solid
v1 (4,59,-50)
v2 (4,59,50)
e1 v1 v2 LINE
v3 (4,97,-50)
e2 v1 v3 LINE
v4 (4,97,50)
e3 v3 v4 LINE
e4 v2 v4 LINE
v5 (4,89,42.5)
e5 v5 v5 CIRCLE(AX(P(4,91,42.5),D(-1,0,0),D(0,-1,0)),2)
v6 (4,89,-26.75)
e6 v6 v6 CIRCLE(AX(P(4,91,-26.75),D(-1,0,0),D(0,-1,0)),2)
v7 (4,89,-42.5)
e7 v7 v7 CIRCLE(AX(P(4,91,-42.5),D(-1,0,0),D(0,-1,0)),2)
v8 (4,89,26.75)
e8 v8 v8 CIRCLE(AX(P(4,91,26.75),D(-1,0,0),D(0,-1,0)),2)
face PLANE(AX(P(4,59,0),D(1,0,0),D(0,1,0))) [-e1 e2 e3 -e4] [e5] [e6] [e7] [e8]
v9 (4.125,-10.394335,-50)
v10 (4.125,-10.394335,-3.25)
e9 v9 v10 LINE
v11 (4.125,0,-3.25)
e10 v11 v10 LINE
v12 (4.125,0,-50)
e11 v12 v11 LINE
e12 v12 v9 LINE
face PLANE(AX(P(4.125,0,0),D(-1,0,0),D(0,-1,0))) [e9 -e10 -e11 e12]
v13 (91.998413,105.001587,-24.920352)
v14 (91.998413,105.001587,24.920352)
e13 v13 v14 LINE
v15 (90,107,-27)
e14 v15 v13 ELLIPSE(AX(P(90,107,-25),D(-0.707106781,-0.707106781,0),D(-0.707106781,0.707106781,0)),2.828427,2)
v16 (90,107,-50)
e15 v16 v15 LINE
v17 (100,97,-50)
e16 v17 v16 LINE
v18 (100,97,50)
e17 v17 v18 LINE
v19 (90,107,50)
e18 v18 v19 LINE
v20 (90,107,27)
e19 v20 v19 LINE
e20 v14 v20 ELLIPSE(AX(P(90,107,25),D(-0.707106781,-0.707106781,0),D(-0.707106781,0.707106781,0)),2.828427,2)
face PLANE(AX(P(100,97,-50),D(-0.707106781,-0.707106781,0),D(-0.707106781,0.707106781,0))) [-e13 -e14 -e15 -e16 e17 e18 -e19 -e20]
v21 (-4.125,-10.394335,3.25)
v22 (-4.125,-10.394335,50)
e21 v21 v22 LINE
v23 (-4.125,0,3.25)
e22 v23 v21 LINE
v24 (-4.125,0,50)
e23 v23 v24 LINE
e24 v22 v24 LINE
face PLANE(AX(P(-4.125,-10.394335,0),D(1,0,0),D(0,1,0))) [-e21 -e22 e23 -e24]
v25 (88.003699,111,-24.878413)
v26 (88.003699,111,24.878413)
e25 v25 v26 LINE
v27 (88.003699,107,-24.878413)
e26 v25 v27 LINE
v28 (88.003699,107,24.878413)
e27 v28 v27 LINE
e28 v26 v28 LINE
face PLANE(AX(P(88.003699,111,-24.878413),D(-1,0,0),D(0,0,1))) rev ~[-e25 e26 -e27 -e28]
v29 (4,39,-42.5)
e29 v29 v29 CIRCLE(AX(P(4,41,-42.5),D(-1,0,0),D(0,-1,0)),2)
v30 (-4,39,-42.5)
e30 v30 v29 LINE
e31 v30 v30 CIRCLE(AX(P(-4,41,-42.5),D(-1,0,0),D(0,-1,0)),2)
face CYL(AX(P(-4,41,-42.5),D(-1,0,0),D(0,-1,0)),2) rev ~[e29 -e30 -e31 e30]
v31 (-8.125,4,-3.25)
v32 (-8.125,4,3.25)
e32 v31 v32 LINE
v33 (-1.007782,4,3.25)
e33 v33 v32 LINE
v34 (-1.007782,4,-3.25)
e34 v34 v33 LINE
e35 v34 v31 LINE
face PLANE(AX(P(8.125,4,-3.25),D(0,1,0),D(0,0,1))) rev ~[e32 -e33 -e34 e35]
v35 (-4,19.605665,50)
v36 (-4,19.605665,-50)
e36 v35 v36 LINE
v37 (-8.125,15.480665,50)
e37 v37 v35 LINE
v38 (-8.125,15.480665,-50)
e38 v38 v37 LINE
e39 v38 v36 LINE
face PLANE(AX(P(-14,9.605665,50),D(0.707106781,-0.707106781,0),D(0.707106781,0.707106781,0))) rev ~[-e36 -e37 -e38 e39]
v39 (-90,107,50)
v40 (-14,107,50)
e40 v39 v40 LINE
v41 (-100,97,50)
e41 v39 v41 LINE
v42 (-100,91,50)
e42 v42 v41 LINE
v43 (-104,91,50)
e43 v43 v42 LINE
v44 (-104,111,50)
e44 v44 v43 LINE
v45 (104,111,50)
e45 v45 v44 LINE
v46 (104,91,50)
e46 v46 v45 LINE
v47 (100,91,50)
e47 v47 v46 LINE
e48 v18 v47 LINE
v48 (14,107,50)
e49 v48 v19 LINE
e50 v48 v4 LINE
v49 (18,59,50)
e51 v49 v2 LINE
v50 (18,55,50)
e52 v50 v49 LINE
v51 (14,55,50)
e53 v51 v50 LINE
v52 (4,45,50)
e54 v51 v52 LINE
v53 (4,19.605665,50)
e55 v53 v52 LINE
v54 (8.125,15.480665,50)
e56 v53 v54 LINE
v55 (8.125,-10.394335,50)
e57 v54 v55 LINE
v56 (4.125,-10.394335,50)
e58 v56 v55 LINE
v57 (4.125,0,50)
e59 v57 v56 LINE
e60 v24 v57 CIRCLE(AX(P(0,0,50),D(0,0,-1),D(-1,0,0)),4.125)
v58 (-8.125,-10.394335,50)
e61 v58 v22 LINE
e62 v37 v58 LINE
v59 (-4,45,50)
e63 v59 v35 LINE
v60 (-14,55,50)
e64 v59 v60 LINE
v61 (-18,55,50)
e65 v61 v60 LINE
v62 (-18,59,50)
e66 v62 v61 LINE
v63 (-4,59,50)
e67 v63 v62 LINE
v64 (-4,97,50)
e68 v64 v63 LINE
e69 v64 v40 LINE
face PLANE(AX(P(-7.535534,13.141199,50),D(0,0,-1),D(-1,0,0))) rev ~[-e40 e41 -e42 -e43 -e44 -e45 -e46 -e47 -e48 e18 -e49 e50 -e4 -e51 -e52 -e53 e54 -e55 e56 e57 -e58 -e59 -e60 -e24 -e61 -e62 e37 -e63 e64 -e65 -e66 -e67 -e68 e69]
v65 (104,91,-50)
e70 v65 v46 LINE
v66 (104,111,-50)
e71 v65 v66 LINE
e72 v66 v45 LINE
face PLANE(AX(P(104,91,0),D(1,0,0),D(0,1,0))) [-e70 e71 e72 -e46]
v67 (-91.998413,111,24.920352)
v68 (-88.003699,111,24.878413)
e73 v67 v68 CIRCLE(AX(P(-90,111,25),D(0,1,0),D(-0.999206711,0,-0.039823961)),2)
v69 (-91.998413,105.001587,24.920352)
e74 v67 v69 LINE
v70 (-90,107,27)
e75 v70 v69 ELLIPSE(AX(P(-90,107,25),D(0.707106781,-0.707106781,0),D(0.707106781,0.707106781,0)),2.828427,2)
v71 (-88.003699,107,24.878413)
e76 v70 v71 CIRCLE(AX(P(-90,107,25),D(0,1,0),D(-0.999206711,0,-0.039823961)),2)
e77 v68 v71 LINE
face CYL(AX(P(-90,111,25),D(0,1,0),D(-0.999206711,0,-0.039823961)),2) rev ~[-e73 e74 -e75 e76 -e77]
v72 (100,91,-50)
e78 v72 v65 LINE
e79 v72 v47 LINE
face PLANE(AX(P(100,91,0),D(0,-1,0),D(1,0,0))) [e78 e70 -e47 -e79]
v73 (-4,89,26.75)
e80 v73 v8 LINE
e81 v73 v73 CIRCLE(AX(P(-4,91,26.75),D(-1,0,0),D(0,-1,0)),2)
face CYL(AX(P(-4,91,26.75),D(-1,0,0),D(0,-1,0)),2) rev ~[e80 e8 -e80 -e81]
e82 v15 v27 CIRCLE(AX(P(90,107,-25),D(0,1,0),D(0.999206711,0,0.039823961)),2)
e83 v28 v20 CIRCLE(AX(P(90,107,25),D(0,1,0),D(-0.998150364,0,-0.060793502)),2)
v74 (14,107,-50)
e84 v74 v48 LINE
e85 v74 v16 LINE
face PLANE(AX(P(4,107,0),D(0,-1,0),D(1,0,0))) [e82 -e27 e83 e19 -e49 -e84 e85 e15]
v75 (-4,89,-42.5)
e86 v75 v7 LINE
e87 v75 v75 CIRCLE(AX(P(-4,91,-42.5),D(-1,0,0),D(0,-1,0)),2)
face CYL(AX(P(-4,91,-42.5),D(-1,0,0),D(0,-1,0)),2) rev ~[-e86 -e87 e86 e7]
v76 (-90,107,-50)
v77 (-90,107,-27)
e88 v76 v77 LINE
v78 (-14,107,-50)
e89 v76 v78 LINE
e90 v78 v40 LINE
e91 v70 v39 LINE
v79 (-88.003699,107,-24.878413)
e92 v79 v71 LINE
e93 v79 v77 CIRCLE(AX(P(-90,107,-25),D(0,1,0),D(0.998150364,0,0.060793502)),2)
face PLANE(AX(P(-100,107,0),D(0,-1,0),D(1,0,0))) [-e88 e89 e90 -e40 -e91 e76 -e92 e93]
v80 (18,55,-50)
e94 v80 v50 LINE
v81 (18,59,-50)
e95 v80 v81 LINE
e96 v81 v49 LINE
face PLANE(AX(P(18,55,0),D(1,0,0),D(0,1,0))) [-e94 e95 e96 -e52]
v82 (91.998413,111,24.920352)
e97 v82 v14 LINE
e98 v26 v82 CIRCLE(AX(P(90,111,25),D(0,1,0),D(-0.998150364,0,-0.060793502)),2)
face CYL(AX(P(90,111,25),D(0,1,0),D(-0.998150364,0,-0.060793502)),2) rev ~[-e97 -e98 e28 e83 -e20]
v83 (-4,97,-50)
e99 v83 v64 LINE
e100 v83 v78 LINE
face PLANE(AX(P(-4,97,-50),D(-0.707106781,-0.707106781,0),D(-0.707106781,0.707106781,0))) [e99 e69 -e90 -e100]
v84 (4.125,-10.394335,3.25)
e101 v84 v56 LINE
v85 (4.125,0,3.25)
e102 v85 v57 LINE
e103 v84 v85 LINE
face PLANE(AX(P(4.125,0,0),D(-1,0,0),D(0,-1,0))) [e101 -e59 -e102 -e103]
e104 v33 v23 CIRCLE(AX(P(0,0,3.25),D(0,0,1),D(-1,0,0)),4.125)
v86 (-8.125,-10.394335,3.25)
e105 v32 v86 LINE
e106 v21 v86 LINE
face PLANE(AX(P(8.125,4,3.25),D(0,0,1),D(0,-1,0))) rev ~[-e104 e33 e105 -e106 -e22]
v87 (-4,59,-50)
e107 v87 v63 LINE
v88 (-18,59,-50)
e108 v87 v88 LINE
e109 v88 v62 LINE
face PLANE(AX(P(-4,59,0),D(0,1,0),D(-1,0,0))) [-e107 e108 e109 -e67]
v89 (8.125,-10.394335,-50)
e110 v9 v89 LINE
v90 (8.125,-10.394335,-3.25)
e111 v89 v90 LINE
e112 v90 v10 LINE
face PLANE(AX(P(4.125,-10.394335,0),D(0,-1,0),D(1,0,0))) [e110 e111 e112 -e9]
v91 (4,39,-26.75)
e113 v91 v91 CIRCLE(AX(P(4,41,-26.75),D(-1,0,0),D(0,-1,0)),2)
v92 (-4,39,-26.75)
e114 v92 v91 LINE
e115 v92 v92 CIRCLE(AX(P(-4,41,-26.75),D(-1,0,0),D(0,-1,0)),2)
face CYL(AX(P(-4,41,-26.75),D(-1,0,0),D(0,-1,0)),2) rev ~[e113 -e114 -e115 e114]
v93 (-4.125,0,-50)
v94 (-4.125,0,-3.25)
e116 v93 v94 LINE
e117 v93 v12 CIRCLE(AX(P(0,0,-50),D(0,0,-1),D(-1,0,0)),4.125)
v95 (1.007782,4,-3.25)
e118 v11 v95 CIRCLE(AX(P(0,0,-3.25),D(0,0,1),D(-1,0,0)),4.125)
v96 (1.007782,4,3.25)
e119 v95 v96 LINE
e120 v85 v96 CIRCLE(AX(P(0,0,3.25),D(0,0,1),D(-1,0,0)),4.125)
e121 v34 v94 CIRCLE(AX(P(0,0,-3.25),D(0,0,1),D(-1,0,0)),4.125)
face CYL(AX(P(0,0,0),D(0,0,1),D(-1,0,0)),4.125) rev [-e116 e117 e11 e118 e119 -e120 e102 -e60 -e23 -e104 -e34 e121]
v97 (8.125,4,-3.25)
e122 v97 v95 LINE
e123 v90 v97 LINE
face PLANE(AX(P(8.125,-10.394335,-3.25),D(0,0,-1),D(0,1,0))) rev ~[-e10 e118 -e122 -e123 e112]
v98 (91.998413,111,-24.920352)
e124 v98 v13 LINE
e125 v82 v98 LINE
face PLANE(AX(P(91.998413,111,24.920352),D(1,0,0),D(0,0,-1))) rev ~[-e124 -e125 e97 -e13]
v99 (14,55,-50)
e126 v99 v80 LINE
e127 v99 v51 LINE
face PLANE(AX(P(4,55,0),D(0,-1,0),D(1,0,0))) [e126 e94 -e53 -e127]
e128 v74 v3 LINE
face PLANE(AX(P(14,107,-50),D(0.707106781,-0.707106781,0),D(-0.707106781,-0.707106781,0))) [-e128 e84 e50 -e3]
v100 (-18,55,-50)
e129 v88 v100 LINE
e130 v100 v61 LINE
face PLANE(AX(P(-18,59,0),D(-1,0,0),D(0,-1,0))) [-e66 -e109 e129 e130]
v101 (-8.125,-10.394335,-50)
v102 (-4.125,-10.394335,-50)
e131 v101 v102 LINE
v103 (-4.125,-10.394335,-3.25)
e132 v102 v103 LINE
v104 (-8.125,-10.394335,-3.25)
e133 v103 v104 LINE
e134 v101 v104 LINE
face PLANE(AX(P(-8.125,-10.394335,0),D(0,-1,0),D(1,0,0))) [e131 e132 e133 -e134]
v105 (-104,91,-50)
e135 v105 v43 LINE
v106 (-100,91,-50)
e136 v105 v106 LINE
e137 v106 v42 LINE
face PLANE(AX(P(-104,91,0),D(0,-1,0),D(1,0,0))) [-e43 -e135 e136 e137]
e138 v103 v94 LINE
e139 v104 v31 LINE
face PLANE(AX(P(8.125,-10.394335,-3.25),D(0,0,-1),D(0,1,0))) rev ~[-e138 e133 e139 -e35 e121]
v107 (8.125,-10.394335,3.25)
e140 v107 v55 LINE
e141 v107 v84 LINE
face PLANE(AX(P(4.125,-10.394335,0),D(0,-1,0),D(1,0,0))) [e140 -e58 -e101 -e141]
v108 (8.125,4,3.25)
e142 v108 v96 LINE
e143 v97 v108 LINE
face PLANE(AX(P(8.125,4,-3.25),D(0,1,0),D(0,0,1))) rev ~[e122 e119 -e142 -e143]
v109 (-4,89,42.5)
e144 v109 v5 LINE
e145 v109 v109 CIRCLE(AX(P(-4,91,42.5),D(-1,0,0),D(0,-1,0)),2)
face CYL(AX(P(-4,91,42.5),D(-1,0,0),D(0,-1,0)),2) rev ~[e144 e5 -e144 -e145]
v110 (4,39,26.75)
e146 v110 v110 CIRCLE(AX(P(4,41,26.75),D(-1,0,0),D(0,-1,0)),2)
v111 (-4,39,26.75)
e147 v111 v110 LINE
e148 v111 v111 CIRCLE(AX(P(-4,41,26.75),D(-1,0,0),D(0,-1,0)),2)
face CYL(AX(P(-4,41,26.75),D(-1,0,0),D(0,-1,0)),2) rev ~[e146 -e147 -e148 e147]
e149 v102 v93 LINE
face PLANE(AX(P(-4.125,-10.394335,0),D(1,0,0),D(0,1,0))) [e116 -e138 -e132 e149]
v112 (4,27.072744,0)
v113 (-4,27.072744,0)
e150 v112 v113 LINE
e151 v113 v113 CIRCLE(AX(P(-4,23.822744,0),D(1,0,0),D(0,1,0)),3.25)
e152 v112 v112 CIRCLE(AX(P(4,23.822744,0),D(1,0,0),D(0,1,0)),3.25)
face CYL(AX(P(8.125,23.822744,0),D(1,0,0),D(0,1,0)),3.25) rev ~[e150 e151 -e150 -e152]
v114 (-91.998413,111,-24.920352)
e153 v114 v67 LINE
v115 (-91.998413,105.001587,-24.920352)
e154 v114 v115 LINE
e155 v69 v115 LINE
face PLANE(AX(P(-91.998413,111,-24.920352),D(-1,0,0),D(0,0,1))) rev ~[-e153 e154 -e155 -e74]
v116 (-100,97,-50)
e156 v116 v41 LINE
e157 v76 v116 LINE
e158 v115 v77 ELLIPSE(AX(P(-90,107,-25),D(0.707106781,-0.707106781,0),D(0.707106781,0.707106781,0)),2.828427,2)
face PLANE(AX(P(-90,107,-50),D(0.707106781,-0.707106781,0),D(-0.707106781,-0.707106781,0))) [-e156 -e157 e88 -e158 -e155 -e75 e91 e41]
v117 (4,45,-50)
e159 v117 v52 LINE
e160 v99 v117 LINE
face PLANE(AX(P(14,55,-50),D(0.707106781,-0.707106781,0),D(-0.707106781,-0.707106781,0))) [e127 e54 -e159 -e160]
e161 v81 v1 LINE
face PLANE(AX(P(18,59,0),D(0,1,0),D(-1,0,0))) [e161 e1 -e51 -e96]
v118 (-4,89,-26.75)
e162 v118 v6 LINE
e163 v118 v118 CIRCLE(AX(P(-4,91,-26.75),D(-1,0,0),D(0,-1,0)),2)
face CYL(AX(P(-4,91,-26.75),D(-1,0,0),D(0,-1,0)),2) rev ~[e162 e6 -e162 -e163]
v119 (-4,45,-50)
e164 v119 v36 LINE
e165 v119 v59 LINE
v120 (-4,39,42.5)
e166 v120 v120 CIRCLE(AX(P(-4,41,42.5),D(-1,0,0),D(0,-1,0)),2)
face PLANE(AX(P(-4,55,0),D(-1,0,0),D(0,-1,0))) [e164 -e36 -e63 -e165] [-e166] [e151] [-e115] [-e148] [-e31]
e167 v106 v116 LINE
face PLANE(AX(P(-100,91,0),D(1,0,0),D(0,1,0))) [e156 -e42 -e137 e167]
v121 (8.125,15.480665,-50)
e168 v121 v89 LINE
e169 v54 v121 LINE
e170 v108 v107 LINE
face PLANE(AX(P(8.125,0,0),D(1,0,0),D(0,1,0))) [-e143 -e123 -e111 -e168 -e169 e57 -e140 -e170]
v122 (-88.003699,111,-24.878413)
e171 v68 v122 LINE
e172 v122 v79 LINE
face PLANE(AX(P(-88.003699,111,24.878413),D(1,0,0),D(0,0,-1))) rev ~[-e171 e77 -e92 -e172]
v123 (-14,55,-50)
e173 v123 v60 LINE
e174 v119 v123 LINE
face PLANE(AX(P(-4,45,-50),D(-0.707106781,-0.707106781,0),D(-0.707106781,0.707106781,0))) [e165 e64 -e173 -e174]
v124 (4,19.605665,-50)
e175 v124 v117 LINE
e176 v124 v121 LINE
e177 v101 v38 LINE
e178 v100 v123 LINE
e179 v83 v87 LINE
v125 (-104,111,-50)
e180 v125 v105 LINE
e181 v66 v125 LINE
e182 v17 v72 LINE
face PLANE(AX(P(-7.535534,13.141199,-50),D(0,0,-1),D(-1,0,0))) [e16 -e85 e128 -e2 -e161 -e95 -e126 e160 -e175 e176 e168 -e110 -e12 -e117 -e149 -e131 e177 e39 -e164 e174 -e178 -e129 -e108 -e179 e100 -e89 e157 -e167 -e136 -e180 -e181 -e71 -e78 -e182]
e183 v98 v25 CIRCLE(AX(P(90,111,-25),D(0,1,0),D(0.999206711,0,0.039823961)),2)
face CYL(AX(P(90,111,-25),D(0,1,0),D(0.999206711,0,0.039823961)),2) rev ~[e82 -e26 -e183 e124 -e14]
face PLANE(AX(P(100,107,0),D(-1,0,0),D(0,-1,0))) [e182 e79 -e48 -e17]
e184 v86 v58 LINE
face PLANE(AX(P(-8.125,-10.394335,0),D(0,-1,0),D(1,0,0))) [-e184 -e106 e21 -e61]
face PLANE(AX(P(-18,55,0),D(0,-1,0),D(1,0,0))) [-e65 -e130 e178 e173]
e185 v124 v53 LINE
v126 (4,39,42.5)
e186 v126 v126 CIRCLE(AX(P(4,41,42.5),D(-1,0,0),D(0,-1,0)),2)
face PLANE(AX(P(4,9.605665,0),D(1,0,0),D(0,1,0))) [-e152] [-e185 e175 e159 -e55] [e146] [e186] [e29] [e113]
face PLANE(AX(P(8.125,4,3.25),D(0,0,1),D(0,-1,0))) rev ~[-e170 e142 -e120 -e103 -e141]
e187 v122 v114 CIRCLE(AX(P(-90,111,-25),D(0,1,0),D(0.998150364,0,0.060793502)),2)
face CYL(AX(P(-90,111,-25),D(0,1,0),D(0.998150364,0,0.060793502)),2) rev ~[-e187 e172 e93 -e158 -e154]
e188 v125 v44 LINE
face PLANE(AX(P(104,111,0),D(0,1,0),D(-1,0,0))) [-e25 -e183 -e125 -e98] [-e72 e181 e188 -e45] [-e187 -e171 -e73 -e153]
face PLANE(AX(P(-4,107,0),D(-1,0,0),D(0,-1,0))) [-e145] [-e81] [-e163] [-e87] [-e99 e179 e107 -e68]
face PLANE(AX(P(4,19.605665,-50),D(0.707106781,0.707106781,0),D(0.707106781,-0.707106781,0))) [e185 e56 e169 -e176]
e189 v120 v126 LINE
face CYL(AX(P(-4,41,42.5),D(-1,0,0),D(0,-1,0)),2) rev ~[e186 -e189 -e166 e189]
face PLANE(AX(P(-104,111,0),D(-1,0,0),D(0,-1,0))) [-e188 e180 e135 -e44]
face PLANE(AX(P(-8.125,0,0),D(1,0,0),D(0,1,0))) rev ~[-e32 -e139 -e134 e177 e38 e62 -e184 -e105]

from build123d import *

# Parameters (mm, degrees)
F2_DEPTH     = 50
F3_T1_DEPTH  = 100
F3_T6_DEPTH  = 100
F3_T11_DEPTH = 100
F5_R         = 2
F6_DEPTH     = 8
F8_DEPTH     = 6.001
F9_R         = 3.25
F10_DEPTH    = 25


# Not quite as in the source:
# - a fillet or chamfer that OpenCascade refuses, or shapes differently, is made with other operations: its cross-section is extruded or revolved along the edge and cut away or added


with BuildPart() as f2:
    # F1 (on Top) → F2 (new body, symmetric)
    with BuildSketch(Plane.XY):
        with BuildLine():
            Line((-8.125, 9.6056647934), (-8.125, -10.3943352066))
            Line((-8.125, -10.3943352066), (-4.125, -10.3943352066))
            Line((-4.125, -10.3943352066), (-4.125, 0))
            ThreePointArc((-4.125, 0), (0, 4.125), (4.125, 0))
            Line((4.125, 0), (4.125, -10.3943352066))
            Line((4.125, -10.3943352066), (8.125, -10.3943352066))
            Line((8.125, -10.3943352066), (8.125, 9.6056647934))
            Line((8.125, 9.6056647934), (4, 9.6056647934))
            Line((4, 9.6056647934), (4, 55))
            Line((4, 55), (18, 55))
            Line((18, 55), (18, 59))
            Line((18, 59), (4, 59))
            Line((4, 59), (4, 107))
            Line((4, 107), (100, 107))
            Line((100, 107), (100, 91))
            Line((100, 91), (104, 91))
            Line((104, 91), (104, 111))
            Line((104, 111), (0, 111))
            Line((0, 111), (-104, 111))
            Line((-104, 111), (-104, 91))
            Line((-104, 91), (-100, 91))
            Line((-100, 91), (-100, 107))
            Line((-100, 107), (-4, 107))
            Line((-4, 107), (-4, 59))
            Line((-4, 59), (-18, 59))
            Line((-18, 59), (-18, 55))
            Line((-18, 55), (-4, 55))
            Line((-4, 55), (-4, 9.6056647934))
            Line((-4, 9.6056647934), (-8.125, 9.6056647934))
        make_face()
    extrude(amount=F2_DEPTH, both=True)

    # F3: chamfer of 10 on 8 edges, made by hand

    # F3_s2 → F3_t1 (join)
    with BuildSketch(Plane.XY.offset(-50)):
        Polygon((14, 55), (4, 45), (4, 55), align=None)
        Polygon((-4, 45), (-14, 55), (-4, 55), align=None)
        Polygon((14, 107), (4, 97), (4, 107), align=None)
        Polygon((-4, 97), (-14, 107), (-4, 107), align=None)
        Polygon((100, 97), (90, 107), (100, 107), align=None)
        Polygon((-90, 107), (-100, 97), (-100, 107), align=None)
    extrude(amount=F3_T1_DEPTH)


with BuildPart() as f3_tool4:
    # F3_s5 → F3_t6 (new body)
    with BuildSketch(Plane.XY.offset(-50)):
        Polygon((4, 19.6056647934), (14, 9.6056647934), (4, 9.6056647934), align=None)
    extrude(amount=F3_T6_DEPTH)

    split(bisect_by=Plane.YZ.offset(8.125), keep=Keep.BOTTOM)


with BuildPart() as f2_1:
    add(f2.part)

    # F3_t3: union F3_tool4
    add(f3_tool4.part)


with BuildPart() as f3_tool9:
    # F3_s10 → F3_t11 (new body)
    with BuildSketch(Plane.XY.offset(50)):
        Polygon((-14, 9.6056647934), (-4, 19.6056647934), (-4, 9.6056647934), align=None)
    extrude(amount=-F3_T11_DEPTH)

    split(bisect_by=Plane.YZ.offset(-8.125), keep=Keep.TOP)


with BuildPart() as f2_2:
    add(f2_1.part)

    # F3_t8: union F3_tool9
    add(f3_tool9.part)

    # F5 (on face) → F6 (cut, through all)
    with BuildSketch(Plane(origin=(-4, 0, 0), x_dir=(0, -1, 0), z_dir=(-1, 0, 0))):
        with Locations((-91, -26.75)):
            Circle(F5_R)
        with Locations((-91, -42.5)):
            Circle(F5_R)
        with Locations((-41, -26.75)):
            Circle(F5_R)
        with Locations((-41, -42.5)):
            Circle(F5_R)
        with Locations((-41, 26.75)):
            Circle(F5_R)
        with Locations((-41, 42.5)):
            Circle(F5_R)
        with Locations((-91, 42.5)):
            Circle(F5_R)
        with Locations((-91, 26.75)):
            Circle(F5_R)
    extrude(amount=-F6_DEPTH, mode=Mode.SUBTRACT)

    # F7 (on face) → F8 (cut, through all)
    with BuildSketch(Plane(origin=(0, 111, 0), x_dir=(-1, 0, 0), z_dir=(0, 1, 0))):
        with BuildLine():
            Line((-91.9984134228, 0), (-91.9984134228, -24.9203520777))
            ThreePointArc((-91.9984134228, -24.9203520777), (-89.9790038693, -26.9998897876), (-88.003699271, -24.8784129963))
            Line((-88.003699271, -24.8784129963), (-88.003699271, 0))
            Line((-88.003699271, 0), (-88.003699271, 24.8784129963))
            ThreePointArc((-88.003699271, 24.8784129963), (-89.9790038693, 26.9998897876), (-91.9984134228, 24.9203520777))
            Line((-91.9984134228, 24.9203520777), (-91.9984134228, 0))
        make_face()
        with BuildLine():
            Line((88.003699271, 0), (88.003699271, -24.8784129963))
            ThreePointArc((88.003699271, -24.8784129963), (89.9790038693, -26.9998897876), (91.9984134228, -24.9203520777))
            Line((91.9984134228, -24.9203520777), (91.9984134228, 0))
            Line((91.9984134228, 0), (91.9984134228, 24.9203520777))
            ThreePointArc((91.9984134228, 24.9203520777), (89.9790038693, 26.9998897876), (88.003699271, 24.8784129963))
            Line((88.003699271, 24.8784129963), (88.003699271, 0))
        make_face()
    extrude(amount=-F8_DEPTH, mode=Mode.SUBTRACT)

    # F9 (on face) → F10 (cut)
    with BuildSketch(Plane.YZ.offset(8.125)):
        Polygon((4, 3.25), (-10.3943352066, 3.25), (-10.3943352066, 0), (-10.3943352066, -3.25), (4, -3.25), (4, 0), align=None)
        with Locations((23.8227438553, 0)):
            Circle(F9_R)
    extrude(amount=-F10_DEPTH, mode=Mode.SUBTRACT)


solid = f2_2.part
